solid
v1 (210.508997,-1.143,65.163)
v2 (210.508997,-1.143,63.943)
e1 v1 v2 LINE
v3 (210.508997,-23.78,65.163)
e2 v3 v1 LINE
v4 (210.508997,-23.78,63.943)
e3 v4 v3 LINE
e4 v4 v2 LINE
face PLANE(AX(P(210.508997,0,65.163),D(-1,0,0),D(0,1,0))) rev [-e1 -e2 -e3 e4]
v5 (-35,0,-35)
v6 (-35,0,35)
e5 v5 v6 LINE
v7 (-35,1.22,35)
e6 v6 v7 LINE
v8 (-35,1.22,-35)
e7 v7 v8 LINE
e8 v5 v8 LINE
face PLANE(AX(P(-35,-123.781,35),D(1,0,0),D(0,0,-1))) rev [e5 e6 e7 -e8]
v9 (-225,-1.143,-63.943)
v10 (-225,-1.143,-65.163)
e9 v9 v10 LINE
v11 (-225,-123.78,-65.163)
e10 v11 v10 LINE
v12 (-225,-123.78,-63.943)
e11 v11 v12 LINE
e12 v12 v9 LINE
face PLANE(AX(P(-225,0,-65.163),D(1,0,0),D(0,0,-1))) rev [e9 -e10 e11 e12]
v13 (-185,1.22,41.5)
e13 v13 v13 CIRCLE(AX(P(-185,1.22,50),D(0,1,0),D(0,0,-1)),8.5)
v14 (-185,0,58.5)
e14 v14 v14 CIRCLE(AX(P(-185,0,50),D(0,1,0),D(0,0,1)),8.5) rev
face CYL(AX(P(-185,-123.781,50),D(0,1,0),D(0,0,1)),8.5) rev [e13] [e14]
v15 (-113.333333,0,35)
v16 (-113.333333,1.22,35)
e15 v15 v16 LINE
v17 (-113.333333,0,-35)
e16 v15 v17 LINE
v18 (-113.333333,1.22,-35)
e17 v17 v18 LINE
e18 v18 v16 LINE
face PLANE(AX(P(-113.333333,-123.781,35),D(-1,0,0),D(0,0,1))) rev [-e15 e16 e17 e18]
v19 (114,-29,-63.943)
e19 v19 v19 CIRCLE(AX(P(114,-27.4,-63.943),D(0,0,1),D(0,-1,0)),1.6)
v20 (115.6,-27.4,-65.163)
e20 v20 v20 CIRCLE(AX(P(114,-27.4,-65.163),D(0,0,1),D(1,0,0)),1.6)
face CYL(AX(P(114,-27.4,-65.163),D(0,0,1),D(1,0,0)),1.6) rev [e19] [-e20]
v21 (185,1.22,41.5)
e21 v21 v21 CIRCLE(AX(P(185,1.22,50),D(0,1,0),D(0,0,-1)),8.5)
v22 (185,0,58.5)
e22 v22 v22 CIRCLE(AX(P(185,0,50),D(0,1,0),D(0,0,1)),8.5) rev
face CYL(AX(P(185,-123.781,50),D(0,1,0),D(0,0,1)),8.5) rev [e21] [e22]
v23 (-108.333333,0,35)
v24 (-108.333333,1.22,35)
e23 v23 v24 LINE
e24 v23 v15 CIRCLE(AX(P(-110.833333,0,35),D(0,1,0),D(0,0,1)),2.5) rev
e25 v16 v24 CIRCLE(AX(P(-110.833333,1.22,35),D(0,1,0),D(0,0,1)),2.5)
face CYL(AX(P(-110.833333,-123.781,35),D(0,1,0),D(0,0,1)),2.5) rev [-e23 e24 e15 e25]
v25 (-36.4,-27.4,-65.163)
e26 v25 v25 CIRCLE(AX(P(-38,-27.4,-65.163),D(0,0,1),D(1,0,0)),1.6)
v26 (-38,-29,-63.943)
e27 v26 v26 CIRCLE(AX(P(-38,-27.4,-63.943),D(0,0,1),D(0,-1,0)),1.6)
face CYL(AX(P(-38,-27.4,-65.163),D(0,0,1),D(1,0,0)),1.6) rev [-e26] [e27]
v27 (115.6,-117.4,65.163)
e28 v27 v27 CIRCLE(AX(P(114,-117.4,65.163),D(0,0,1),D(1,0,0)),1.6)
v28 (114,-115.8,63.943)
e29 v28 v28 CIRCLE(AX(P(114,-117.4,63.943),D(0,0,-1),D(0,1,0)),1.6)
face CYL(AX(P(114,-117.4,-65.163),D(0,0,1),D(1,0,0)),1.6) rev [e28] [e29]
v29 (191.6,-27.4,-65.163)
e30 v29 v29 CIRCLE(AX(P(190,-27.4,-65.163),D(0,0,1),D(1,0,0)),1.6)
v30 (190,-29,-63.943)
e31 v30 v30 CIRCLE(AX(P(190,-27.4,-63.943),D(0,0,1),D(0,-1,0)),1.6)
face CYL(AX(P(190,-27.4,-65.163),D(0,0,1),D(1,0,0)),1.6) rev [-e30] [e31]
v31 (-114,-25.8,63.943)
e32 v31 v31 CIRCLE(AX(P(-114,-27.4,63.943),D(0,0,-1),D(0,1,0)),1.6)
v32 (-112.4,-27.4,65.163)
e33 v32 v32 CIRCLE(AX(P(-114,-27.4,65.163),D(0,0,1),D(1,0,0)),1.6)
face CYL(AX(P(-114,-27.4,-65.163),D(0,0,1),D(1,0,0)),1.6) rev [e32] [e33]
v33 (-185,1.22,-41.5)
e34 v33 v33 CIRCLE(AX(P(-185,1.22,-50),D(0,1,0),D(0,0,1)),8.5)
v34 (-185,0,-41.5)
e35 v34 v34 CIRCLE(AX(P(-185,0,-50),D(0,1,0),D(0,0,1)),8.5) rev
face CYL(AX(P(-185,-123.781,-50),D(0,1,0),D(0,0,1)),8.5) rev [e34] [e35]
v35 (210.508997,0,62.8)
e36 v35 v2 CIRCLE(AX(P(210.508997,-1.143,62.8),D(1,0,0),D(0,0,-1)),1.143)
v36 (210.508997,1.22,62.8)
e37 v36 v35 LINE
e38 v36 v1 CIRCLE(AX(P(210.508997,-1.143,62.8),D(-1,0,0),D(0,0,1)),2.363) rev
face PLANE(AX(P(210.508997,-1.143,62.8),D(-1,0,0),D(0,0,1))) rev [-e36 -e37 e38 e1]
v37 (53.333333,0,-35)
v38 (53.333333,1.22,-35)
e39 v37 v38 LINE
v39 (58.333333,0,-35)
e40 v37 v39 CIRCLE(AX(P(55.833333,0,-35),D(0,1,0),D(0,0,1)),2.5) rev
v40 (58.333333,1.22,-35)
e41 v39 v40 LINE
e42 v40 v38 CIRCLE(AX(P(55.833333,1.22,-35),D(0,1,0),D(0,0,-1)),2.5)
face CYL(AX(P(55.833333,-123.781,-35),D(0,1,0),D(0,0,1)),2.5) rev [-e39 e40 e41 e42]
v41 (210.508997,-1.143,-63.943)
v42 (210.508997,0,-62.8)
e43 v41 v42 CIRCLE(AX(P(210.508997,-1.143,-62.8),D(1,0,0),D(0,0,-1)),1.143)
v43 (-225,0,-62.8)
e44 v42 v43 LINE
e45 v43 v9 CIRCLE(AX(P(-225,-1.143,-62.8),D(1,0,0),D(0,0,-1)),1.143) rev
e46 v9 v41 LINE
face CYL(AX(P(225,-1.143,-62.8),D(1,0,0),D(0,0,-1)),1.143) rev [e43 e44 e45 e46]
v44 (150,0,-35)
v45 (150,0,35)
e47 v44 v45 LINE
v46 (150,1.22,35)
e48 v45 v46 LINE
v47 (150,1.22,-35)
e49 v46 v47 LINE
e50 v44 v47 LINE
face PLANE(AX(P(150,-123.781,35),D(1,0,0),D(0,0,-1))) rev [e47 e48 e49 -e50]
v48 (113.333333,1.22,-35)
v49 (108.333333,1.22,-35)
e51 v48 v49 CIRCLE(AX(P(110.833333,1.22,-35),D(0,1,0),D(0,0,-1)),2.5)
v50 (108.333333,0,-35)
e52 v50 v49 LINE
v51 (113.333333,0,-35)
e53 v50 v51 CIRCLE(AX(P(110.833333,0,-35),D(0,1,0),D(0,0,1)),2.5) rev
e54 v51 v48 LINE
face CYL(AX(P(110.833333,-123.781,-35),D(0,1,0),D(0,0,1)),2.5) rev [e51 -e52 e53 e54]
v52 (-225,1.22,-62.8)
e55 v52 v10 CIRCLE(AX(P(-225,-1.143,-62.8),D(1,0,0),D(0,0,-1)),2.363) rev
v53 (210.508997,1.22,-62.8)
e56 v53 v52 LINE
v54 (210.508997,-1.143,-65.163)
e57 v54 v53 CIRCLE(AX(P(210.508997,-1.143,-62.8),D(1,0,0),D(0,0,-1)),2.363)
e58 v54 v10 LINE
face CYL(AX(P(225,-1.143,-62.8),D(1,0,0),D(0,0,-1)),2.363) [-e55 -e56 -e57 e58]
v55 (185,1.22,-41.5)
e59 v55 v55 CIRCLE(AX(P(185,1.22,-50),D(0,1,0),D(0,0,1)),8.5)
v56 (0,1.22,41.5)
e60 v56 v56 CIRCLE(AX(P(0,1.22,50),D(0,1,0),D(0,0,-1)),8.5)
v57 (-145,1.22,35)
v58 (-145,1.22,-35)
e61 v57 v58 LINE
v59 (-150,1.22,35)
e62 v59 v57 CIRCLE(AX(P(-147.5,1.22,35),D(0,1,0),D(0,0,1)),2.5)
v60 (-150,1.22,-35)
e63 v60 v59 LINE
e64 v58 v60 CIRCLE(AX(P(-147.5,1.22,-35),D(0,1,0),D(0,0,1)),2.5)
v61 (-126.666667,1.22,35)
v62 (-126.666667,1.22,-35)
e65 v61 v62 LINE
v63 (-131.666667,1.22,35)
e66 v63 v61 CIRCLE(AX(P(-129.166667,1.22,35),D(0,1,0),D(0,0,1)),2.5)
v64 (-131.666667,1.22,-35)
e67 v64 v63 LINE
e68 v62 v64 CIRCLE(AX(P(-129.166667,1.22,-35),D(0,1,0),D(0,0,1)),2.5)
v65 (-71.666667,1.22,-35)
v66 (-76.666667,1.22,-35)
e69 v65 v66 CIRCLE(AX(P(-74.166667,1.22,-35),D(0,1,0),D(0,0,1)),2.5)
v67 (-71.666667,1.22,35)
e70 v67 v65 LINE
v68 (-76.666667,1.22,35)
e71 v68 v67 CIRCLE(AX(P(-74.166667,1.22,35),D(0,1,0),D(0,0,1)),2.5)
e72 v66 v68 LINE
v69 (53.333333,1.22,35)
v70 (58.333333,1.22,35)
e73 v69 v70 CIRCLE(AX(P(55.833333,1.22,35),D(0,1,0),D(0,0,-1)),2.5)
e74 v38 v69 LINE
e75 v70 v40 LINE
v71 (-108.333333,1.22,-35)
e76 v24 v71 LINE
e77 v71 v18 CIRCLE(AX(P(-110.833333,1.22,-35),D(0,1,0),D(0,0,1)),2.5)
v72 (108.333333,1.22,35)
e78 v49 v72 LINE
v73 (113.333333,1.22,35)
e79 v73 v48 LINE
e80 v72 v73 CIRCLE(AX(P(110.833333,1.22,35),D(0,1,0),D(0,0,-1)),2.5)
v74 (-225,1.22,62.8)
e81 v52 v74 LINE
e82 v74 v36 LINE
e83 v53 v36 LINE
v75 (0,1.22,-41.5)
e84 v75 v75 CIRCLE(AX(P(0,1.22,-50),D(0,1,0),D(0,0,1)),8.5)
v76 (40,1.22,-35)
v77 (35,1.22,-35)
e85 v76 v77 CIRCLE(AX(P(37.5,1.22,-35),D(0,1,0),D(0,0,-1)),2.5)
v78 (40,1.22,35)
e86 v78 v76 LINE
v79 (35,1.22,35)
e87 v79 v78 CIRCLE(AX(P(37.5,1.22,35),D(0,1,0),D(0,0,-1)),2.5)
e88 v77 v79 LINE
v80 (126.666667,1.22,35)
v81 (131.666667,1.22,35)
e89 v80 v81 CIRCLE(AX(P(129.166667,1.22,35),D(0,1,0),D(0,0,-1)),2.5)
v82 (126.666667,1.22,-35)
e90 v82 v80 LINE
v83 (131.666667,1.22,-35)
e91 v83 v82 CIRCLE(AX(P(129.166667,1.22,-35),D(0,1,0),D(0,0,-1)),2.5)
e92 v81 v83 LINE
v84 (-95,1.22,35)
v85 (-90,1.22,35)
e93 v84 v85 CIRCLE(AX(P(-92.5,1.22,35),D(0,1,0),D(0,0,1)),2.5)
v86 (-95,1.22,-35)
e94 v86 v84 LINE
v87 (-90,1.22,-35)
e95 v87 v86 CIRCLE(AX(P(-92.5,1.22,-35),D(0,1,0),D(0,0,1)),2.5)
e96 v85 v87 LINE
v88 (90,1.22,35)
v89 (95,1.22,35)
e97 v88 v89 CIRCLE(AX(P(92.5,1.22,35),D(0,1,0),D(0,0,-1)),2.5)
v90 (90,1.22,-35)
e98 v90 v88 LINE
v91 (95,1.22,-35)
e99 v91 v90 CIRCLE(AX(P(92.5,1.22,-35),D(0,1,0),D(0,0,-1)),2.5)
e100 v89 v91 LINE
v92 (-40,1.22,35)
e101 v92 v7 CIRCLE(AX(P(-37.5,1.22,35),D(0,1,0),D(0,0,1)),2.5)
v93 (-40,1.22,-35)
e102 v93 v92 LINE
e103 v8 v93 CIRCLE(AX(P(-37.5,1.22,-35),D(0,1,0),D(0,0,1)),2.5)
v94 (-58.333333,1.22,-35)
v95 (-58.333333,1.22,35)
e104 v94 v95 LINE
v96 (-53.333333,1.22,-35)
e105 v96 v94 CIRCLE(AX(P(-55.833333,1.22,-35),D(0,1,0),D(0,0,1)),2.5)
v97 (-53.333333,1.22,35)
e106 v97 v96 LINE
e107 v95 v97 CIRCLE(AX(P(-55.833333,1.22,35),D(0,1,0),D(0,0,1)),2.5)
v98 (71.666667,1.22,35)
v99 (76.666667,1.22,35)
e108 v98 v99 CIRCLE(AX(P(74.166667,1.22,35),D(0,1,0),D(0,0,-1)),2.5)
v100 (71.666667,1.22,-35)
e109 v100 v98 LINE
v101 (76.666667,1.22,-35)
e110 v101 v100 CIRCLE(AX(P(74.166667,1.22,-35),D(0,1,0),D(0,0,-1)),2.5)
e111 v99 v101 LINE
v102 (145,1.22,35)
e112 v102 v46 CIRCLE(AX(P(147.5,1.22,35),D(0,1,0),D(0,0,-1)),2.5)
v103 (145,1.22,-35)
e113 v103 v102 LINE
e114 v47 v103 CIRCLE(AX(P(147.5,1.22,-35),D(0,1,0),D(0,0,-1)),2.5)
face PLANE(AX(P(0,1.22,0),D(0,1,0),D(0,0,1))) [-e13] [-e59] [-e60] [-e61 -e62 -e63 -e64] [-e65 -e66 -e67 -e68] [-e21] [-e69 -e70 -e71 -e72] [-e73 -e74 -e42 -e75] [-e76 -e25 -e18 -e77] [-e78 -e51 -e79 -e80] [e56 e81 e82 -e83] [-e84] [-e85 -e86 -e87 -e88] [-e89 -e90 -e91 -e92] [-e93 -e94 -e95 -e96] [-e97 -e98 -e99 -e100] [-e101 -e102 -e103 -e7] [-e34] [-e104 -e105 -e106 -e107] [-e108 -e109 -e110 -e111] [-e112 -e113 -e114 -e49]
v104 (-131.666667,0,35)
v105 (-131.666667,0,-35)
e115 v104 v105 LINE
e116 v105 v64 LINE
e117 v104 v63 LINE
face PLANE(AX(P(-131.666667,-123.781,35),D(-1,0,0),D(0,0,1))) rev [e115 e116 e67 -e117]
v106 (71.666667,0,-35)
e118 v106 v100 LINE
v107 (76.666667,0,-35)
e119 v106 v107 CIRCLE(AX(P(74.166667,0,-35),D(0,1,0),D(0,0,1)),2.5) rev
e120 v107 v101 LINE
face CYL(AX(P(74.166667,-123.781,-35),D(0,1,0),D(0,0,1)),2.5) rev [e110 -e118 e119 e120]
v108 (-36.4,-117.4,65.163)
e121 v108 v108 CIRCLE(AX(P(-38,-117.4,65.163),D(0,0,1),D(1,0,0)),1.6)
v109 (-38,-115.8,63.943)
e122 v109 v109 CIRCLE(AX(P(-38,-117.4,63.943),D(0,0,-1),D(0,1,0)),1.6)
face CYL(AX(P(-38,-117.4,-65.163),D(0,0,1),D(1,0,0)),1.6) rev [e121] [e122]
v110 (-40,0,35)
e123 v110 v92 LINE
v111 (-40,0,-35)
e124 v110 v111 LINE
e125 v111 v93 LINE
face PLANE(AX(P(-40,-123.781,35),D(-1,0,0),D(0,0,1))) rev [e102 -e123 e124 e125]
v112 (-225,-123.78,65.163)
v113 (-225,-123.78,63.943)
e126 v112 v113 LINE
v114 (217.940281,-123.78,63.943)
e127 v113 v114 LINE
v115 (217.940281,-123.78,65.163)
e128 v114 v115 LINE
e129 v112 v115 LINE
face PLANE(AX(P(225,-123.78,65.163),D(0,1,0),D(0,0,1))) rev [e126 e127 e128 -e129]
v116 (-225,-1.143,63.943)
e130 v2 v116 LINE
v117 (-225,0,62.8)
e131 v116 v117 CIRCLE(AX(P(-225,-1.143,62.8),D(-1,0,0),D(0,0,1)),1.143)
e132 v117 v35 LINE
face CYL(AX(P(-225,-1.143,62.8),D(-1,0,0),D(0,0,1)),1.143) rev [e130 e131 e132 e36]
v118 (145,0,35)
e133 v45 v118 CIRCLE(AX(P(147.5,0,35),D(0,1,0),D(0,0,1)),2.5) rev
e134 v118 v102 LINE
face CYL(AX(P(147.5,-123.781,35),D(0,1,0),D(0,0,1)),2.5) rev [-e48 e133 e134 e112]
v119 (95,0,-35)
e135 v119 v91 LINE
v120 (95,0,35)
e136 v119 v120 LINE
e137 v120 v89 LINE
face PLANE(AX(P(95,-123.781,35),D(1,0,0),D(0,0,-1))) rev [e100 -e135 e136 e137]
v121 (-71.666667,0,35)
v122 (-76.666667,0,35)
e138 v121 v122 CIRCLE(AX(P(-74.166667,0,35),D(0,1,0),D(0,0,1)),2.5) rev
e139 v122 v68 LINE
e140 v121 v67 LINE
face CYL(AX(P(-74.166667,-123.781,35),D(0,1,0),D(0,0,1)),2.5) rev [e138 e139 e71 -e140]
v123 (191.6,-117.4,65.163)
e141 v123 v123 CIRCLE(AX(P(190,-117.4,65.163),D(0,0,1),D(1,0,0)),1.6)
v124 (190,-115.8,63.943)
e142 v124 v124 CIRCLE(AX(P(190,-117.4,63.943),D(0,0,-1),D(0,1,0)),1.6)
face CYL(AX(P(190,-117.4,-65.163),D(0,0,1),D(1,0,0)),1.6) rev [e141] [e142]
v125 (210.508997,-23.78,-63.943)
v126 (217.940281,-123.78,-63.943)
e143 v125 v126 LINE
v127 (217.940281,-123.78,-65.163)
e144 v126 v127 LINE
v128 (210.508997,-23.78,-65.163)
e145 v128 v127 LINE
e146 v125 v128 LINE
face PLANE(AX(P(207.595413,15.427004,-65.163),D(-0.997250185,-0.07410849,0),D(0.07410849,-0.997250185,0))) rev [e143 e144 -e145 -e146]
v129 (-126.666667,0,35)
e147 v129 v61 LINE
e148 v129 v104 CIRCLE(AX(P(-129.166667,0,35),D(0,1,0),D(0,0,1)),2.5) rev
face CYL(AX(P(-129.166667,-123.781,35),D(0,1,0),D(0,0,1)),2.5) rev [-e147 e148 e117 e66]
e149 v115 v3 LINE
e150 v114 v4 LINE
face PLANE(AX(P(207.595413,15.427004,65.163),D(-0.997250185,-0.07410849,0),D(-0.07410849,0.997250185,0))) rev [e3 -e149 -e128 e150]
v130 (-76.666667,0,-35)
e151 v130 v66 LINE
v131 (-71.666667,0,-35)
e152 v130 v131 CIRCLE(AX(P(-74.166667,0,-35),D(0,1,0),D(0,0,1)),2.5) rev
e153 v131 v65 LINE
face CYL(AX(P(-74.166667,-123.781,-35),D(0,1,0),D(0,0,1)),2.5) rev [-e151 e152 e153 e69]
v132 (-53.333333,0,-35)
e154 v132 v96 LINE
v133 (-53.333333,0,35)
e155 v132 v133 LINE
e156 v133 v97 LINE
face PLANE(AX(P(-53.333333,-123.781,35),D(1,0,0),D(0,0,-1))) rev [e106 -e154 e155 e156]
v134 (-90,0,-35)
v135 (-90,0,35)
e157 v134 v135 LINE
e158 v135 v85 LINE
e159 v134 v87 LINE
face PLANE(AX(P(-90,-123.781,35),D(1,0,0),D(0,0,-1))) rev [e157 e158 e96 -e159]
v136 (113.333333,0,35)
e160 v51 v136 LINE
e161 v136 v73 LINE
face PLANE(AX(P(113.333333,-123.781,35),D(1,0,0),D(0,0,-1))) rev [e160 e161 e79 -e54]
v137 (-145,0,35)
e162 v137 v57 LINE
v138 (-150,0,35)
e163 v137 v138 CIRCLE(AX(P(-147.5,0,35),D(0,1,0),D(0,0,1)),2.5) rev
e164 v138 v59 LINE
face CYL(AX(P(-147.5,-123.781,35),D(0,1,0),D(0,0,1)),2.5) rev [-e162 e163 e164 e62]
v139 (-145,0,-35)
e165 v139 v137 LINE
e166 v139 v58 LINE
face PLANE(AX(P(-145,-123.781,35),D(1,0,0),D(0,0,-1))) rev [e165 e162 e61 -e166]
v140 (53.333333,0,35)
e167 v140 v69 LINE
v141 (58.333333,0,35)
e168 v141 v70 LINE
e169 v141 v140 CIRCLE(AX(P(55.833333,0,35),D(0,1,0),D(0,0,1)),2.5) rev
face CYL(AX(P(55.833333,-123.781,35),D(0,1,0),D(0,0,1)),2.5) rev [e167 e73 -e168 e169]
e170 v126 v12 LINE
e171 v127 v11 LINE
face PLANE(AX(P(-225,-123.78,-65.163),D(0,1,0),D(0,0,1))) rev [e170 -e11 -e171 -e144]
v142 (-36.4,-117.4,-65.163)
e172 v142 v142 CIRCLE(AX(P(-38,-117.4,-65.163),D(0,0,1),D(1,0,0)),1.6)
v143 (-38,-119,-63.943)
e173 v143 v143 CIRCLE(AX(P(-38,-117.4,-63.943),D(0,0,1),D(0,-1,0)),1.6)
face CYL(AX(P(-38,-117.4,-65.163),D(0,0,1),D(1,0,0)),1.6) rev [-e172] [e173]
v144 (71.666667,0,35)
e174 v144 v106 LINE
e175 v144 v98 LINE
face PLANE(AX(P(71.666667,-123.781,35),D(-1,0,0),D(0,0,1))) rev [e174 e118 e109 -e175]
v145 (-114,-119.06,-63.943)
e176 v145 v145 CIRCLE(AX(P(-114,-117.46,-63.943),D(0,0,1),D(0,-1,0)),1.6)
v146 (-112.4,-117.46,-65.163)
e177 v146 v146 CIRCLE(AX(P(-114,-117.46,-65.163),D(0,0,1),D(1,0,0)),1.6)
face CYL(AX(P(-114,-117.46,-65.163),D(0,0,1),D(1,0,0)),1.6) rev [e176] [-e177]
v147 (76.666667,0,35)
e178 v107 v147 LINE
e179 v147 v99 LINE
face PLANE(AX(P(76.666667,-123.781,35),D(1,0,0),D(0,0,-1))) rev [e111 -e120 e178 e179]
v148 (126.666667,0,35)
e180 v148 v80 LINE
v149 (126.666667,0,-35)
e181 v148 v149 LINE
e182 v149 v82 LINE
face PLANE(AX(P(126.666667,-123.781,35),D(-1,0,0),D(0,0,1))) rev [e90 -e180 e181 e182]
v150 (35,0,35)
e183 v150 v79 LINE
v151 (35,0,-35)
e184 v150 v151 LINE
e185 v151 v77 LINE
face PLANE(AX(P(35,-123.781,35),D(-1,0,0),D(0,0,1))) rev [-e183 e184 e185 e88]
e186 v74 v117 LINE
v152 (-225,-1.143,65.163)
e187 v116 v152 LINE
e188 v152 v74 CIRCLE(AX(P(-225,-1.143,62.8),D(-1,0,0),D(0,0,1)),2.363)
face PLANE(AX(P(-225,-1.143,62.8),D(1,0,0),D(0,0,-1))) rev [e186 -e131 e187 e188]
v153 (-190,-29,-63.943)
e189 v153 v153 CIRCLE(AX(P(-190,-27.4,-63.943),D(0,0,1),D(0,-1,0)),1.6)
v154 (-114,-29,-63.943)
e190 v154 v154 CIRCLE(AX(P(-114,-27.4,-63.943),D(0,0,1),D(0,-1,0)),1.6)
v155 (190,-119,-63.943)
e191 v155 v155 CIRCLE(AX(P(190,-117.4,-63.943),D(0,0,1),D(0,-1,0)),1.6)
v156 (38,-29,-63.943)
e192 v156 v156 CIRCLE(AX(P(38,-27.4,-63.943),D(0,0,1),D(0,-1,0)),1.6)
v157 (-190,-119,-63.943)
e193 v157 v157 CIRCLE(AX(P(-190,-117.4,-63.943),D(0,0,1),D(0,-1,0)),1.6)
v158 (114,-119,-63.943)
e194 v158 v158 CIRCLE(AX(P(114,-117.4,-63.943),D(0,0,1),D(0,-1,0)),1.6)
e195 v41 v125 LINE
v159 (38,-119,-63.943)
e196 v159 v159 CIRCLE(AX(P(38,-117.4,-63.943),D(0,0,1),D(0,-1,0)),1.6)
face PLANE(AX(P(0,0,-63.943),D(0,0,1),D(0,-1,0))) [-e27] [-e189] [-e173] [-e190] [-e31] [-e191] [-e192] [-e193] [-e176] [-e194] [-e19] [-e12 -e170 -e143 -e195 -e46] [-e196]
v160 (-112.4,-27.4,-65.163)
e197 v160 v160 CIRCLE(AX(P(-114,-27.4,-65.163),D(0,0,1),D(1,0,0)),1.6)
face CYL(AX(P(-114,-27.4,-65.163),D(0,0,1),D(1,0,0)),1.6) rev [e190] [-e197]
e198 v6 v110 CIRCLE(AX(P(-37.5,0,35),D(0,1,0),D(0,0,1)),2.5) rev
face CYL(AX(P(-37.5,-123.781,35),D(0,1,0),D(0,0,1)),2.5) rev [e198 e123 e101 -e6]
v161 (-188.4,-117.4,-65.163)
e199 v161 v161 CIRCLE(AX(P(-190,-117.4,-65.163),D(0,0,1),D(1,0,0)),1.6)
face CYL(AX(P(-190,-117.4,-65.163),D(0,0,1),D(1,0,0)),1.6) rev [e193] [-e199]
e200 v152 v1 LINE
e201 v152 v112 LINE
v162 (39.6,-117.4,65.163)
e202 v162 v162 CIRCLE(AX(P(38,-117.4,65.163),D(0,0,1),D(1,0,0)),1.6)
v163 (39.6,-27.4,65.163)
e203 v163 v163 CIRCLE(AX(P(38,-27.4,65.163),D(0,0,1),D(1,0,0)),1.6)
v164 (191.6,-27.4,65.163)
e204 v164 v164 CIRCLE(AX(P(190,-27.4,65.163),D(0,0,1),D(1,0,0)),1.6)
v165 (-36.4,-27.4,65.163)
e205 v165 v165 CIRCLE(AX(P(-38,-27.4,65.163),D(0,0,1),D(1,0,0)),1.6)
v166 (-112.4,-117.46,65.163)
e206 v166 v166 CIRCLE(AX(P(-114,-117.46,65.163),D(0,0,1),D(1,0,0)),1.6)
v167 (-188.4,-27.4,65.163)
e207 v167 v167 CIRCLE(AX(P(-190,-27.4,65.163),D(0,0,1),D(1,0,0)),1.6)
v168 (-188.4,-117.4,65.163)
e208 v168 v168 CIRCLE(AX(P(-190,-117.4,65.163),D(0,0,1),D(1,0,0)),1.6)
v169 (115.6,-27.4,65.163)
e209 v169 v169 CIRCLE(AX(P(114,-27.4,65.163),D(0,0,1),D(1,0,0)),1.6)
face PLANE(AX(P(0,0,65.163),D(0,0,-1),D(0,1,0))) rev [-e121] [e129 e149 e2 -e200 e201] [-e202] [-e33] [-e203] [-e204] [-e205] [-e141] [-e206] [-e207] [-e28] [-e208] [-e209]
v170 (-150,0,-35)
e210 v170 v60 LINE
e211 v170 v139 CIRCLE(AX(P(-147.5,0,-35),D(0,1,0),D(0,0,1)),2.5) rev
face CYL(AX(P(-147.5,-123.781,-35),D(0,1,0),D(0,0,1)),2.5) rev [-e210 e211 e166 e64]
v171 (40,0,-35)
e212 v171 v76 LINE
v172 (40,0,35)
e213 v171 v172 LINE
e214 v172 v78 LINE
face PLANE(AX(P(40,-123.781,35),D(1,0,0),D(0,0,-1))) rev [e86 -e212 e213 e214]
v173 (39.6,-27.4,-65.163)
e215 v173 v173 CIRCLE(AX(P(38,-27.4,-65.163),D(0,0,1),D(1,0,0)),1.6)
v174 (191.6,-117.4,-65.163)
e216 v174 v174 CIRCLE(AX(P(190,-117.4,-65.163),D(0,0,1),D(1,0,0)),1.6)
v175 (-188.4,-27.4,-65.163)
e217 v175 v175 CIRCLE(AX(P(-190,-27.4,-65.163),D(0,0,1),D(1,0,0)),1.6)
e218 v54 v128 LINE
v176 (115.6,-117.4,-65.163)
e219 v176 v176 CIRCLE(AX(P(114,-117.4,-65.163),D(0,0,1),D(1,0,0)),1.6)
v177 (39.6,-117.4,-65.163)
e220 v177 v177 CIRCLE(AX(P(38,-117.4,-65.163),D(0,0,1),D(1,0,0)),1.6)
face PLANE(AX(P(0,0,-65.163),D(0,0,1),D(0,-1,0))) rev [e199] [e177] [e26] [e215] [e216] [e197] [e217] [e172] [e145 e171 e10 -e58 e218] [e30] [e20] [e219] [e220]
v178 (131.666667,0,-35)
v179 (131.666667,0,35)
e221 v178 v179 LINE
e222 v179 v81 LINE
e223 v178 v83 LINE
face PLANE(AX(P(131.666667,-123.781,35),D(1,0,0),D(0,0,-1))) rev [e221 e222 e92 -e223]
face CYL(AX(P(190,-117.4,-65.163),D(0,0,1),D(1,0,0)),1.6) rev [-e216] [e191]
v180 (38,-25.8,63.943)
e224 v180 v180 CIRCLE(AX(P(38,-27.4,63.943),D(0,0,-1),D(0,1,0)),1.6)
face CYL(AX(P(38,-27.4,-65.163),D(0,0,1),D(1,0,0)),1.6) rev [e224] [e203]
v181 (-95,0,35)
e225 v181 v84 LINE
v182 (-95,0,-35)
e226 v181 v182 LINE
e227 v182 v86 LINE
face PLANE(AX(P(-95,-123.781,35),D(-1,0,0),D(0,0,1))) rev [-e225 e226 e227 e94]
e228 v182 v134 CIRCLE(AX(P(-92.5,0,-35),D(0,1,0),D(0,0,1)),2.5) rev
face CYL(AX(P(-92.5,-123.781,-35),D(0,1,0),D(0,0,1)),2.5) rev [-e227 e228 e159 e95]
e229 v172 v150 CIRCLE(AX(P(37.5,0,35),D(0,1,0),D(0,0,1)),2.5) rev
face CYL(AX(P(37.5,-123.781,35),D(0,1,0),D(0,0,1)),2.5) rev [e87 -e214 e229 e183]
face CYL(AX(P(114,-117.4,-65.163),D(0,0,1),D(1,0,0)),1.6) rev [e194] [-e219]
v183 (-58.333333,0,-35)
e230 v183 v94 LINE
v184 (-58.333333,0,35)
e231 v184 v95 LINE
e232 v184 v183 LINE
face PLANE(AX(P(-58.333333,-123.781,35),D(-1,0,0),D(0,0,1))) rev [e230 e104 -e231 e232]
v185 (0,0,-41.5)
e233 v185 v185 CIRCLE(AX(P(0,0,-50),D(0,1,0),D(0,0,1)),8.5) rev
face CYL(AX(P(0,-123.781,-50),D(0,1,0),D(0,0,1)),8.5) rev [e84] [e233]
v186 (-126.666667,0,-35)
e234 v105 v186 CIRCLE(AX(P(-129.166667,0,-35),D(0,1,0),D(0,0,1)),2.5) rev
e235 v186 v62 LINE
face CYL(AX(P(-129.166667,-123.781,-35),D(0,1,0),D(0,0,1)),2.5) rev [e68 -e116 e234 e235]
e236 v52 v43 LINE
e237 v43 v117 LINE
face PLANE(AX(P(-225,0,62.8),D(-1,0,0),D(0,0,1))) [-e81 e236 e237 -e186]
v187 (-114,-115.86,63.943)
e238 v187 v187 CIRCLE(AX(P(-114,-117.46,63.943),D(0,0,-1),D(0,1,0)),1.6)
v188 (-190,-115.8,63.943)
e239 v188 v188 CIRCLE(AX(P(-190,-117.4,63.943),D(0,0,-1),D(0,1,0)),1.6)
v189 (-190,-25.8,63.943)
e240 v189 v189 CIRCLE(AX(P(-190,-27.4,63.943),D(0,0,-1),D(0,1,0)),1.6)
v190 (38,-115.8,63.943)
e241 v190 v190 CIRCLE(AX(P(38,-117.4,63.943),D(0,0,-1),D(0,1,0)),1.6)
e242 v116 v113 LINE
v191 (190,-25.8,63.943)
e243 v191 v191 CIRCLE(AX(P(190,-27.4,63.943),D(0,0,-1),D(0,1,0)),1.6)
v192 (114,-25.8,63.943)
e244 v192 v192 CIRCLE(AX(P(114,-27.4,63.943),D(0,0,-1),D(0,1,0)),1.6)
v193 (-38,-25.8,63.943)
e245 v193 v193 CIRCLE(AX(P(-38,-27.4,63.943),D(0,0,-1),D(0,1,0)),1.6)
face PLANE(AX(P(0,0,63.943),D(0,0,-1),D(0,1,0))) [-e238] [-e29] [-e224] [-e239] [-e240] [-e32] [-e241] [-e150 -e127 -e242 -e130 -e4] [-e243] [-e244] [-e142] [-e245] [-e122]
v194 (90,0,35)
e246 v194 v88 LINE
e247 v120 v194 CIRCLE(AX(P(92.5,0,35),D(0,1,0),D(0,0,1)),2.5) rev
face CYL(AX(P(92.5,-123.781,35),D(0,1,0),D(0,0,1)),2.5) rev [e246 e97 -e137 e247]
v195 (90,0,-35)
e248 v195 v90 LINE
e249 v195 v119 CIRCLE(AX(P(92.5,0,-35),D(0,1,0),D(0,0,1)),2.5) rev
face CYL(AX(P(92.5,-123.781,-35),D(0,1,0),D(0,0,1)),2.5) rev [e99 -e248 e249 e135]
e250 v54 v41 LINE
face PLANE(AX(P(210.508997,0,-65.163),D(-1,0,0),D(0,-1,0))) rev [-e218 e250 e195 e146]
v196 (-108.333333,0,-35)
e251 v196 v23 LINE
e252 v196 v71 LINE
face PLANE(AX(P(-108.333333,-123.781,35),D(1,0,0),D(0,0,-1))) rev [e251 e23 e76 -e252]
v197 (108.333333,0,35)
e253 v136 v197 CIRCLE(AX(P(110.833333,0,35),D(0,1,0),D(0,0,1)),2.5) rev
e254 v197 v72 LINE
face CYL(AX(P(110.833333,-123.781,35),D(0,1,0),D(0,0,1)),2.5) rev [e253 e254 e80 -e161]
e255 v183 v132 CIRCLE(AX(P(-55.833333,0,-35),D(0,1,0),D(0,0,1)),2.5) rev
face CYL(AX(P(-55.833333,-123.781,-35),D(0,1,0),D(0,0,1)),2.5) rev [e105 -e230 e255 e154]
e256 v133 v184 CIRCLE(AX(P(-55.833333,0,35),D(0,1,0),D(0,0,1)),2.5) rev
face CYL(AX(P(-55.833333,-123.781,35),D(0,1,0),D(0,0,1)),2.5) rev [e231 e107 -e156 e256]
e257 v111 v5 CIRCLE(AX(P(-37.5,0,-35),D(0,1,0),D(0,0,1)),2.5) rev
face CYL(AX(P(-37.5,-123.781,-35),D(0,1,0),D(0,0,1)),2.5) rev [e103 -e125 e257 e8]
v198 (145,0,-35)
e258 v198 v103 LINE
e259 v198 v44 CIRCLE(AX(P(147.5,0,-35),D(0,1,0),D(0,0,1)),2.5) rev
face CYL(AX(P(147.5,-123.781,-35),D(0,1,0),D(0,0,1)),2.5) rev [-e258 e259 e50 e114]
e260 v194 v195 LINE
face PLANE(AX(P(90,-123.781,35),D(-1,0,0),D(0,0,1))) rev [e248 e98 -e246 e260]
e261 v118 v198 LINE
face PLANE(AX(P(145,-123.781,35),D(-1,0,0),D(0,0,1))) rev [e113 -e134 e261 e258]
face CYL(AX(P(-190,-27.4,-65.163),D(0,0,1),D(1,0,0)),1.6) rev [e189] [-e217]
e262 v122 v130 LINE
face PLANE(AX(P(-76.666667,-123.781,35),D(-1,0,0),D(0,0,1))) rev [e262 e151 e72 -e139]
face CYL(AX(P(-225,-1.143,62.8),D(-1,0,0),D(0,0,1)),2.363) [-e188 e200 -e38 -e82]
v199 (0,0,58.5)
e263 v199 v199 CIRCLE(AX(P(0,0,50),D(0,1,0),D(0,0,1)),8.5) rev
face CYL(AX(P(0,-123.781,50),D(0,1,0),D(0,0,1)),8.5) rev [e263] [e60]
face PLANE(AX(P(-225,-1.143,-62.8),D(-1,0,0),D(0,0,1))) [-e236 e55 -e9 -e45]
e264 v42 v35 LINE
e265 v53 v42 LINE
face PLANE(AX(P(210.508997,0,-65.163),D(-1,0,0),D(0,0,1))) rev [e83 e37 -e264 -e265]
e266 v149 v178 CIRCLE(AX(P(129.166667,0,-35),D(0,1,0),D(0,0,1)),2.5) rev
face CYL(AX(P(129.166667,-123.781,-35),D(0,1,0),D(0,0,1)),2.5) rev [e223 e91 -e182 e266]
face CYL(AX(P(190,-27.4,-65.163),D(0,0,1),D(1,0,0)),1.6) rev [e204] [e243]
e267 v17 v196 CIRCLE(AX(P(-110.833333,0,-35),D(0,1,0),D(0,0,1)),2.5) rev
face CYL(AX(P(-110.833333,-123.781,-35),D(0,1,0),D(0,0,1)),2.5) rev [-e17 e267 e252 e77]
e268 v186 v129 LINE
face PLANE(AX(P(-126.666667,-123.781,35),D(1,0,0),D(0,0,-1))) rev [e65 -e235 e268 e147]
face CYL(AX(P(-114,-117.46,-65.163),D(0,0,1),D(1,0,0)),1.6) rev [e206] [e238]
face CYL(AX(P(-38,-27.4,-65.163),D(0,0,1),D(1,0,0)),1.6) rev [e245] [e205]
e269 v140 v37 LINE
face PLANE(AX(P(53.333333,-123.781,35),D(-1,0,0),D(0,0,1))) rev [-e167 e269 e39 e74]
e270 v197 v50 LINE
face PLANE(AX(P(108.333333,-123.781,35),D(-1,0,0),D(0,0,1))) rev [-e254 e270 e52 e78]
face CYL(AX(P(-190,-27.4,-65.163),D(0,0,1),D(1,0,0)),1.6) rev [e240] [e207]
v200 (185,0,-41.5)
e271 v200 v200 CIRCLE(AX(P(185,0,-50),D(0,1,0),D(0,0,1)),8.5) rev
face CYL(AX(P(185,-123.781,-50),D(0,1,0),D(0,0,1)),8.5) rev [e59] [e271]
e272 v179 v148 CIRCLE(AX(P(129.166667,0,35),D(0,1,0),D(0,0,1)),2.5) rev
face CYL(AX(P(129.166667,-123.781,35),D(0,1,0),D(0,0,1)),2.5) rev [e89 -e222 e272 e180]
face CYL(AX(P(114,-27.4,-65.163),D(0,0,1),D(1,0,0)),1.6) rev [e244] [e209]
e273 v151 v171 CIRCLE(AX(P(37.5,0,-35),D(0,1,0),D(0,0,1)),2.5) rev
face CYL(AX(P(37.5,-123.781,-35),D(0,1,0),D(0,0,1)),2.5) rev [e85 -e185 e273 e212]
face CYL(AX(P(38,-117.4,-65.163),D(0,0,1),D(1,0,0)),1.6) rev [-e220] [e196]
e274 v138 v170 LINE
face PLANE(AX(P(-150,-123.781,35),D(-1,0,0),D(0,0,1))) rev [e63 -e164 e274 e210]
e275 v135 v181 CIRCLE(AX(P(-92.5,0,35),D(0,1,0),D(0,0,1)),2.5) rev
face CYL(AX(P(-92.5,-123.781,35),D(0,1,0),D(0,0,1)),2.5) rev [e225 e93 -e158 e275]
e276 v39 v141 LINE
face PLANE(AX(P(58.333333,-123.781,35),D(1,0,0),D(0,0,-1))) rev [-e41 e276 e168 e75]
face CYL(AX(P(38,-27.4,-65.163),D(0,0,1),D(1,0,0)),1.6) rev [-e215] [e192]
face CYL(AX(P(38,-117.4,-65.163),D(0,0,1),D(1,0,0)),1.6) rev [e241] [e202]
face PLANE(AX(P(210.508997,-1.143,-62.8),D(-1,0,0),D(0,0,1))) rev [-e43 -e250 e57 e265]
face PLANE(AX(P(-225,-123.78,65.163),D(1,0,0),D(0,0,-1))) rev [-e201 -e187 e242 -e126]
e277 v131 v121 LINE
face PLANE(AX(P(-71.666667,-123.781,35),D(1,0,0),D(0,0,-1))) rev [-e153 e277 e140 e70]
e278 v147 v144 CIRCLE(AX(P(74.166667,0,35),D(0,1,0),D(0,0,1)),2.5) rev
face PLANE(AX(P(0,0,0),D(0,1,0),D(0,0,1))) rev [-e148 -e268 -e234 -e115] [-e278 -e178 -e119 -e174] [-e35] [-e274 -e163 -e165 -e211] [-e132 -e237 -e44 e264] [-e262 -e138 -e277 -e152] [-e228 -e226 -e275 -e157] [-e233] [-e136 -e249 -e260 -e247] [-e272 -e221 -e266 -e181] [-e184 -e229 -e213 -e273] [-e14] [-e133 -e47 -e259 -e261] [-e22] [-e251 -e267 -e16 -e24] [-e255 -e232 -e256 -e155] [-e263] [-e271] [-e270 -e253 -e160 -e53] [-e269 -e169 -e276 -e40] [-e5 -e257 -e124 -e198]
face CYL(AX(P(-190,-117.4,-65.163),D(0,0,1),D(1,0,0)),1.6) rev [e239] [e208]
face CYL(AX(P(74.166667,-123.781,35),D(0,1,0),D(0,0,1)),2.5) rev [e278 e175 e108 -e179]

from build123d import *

# Parameters (mm, degrees)
SKETCH1_W               = 450
SKETCH1_H               = 125.6
BOSS_EXTRUDE1_DEPTH     = 1.22
EDGE_FLANGE1_DEPTH      = 450
EDGE_FLANGE1_BEND_DEPTH = 450
CUT_EXTRUDE1_DEPTH      = 265.939058972
CUT_EXTRUDE1_DEPTH_BACK = 265.939058972
CUT_EXTRUDE4_REACH      = 267.511
SKETCH15_R              = 8.5
CUT_EXTRUDE5_DEPTH      = 265.939058972
CUT_EXTRUDE5_DEPTH_BACK = 265.939058972
SKETCH16_R              = 1.6
CUT_EXTRUDE6_REACH      = 267.511


# Sheet-metal steps are written as plain solids
with BuildPart() as part:
    # Sketch1 → Boss-Extrude1 (new body)
    with BuildSketch(Plane(origin=(0, 0, 0), x_dir=(1, 0, 0), z_dir=(0, 1, 0))):
        Rectangle(SKETCH1_W, SKETCH1_H)
    extrude(amount=BOSS_EXTRUDE1_DEPTH)

    # Edge-Flange1 section (across the edge) → Edge-Flange1 (add)
    with BuildSketch(Plane(origin=(225, 0, 63.943), x_dir=(0, 0, -1), z_dir=(-1, 0, 0))):
        with BuildLine():
            Line((-1.22, 1.143), (-1.22, 123.78))
            Line((-1.22, 123.78), (0, 123.78))
            Line((0, 123.78), (0, 1.143))
            ThreePointArc((0, 1.143), (0.334776949, 0.334776949), (1.143, 0))
            Line((1.143, 0), (1.143, -1.22))
            ThreePointArc((1.143, -1.22), (-0.527893324, -0.527893324), (-1.22, 1.143))
        make_face()
    extrude(amount=EDGE_FLANGE1_DEPTH)

    # Edge-Flange1 section 2 (across the edge) → Edge-Flange1 bend (add)
    with BuildSketch(Plane(origin=(-225, 0, -63.943), x_dir=(0, 0, 1), z_dir=(1, 0, 0))):
        with BuildLine():
            Line((-1.22, 1.143), (-1.22, 123.78))
            Line((-1.22, 123.78), (0, 123.78))
            Line((0, 123.78), (0, 1.143))
            ThreePointArc((0, 1.143), (0.334776949, 0.334776949), (1.143, 0))
            Line((1.143, 0), (1.143, -1.22))
            ThreePointArc((1.143, -1.22), (-0.527893324, -0.527893324), (-1.22, 1.143))
        make_face()
    extrude(amount=EDGE_FLANGE1_BEND_DEPTH)

    # Sketch12 → Cut-Extrude1 (cut, two sides: drawn at the far end of the back side and taken through both)
    with BuildSketch(Plane.XY.offset(-CUT_EXTRUDE1_DEPTH_BACK)):
        Polygon((225, -218.78), (225, -243.78), (235.508996835, -243.78), (235.508996835, 1.22), (210.508996835, 1.22), (210.508996835, -23.78), align=None)
    extrude(amount=CUT_EXTRUDE1_DEPTH + CUT_EXTRUDE1_DEPTH_BACK, mode=Mode.SUBTRACT)

    # Sketch15 → Cut-Extrude4 (cut, up to next)
    with BuildSketch(Plane(origin=(0, 1.22, 0), x_dir=(1, 0, 0), z_dir=(0, 1, 0)), mode=Mode.PRIVATE) as cut_extrude4_sk1:
        with Locations(Location((185, 50, 0), (0, 0, 270))):
            Circle(SKETCH15_R)
    cut_extrude4_tool1 = extrude(cut_extrude4_sk1.sketch, amount=-CUT_EXTRUDE4_REACH, mode=Mode.PRIVATE) & part.part
    # Sketch15 → Cut-Extrude4 (cut, up to next)
    with BuildSketch(Plane(origin=(0, 1.22, 0), x_dir=(1, 0, 0), z_dir=(0, 1, 0)), mode=Mode.PRIVATE) as cut_extrude4_sk2:
        with Locations(Location((-185, 50, 0), (0, 0, 270))):
            Circle(SKETCH15_R)
    cut_extrude4_tool2 = extrude(cut_extrude4_sk2.sketch, amount=-CUT_EXTRUDE4_REACH, mode=Mode.PRIVATE) & part.part
    # Sketch15 → Cut-Extrude4 (cut, up to next)
    with BuildSketch(Plane(origin=(0, 1.22, 0), x_dir=(1, 0, 0), z_dir=(0, 1, 0)), mode=Mode.PRIVATE) as cut_extrude4_sk3:
        with Locations(Location((-185, -50, 0), (0, 0, 270))):
            Circle(SKETCH15_R)
    cut_extrude4_tool3 = extrude(cut_extrude4_sk3.sketch, amount=-CUT_EXTRUDE4_REACH, mode=Mode.PRIVATE) & part.part
    # Sketch15 → Cut-Extrude4 (cut, up to next)
    with BuildSketch(Plane(origin=(0, 1.22, 0), x_dir=(1, 0, 0), z_dir=(0, 1, 0)), mode=Mode.PRIVATE) as cut_extrude4_sk4:
        with Locations(Location((185, -50, 0), (0, 0, 270))):
            Circle(SKETCH15_R)
    cut_extrude4_tool4 = extrude(cut_extrude4_sk4.sketch, amount=-CUT_EXTRUDE4_REACH, mode=Mode.PRIVATE) & part.part
    # Sketch15 → Cut-Extrude4 (cut, up to next)
    with BuildSketch(Plane(origin=(0, 1.22, 0), x_dir=(1, 0, 0), z_dir=(0, 1, 0)), mode=Mode.PRIVATE) as cut_extrude4_sk5:
        with Locations(Location((0, 50, 0), (0, 0, 270))):
            Circle(SKETCH15_R)
    cut_extrude4_tool5 = extrude(cut_extrude4_sk5.sketch, amount=-CUT_EXTRUDE4_REACH, mode=Mode.PRIVATE) & part.part
    # Sketch15 → Cut-Extrude4 (cut, up to next)
    with BuildSketch(Plane(origin=(0, 1.22, 0), x_dir=(1, 0, 0), z_dir=(0, 1, 0)), mode=Mode.PRIVATE) as cut_extrude4_sk6:
        with Locations(Location((0, -50, 0), (0, 0, 270))):
            Circle(SKETCH15_R)
    cut_extrude4_tool6 = extrude(cut_extrude4_sk6.sketch, amount=-CUT_EXTRUDE4_REACH, mode=Mode.PRIVATE) & part.part
    add(cut_extrude4_tool1.solids().sort_by_distance((185, 1.22, -50))[0], mode=Mode.SUBTRACT)
    add(cut_extrude4_tool2.solids().sort_by_distance((-185, 1.22, -50))[0], mode=Mode.SUBTRACT)
    add(cut_extrude4_tool3.solids().sort_by_distance((-185, 1.22, 50))[0], mode=Mode.SUBTRACT)
    add(cut_extrude4_tool4.solids().sort_by_distance((185, 1.22, 50))[0], mode=Mode.SUBTRACT)
    add(cut_extrude4_tool5.solids().sort_by_distance((0, 1.22, -50))[0], mode=Mode.SUBTRACT)
    add(cut_extrude4_tool6.solids().sort_by_distance((0, 1.22, 50))[0], mode=Mode.SUBTRACT)

    # Sketch16 → Cut-Extrude5 (cut, two sides: drawn at the far end of the back side and taken through both)
    with BuildSketch(Plane.XY.offset(-CUT_EXTRUDE5_DEPTH_BACK)):
        with Locations((-190, -27.4)):
            Circle(SKETCH16_R)
        with Locations((-114, -27.4)):
            Circle(SKETCH16_R)
        with Locations((-38, -27.4)):
            Circle(SKETCH16_R)
        with Locations((38, -27.4)):
            Circle(SKETCH16_R)
        with Locations((114, -27.4)):
            Circle(SKETCH16_R)
        with Locations((190, -27.4)):
            Circle(SKETCH16_R)
        with Locations((190, -117.4)):
            Circle(SKETCH16_R)
        with Locations((114, -117.4)):
            Circle(SKETCH16_R)
        with Locations((38, -117.4)):
            Circle(SKETCH16_R)
        with Locations((-38, -117.4)):
            Circle(SKETCH16_R)
        with Locations((-114, -117.46)):
            Circle(SKETCH16_R)
        with Locations((-190, -117.4)):
            Circle(SKETCH16_R)
    extrude(amount=CUT_EXTRUDE5_DEPTH + CUT_EXTRUDE5_DEPTH_BACK, mode=Mode.SUBTRACT)

    # Sketch17 → Cut-Extrude6 (cut, up to next)
    with BuildSketch(Plane(origin=(0, 1.22, 0), x_dir=(1, 0, 0), z_dir=(0, 1, 0)), mode=Mode.PRIVATE) as cut_extrude6_sk1:
        with BuildLine():
            Line((-150, -35), (-150, 35))
            ThreePointArc((-150, 35), (-147.5, 37.5), (-145, 35))
            Line((-145, 35), (-145, -35))
            ThreePointArc((-145, -35), (-147.5, -37.5), (-150, -35))
        make_face()
    cut_extrude6_tool1 = extrude(cut_extrude6_sk1.sketch, amount=-CUT_EXTRUDE6_REACH, mode=Mode.PRIVATE) & part.part
    # Sketch17 → Cut-Extrude6 (cut, up to next)
    with BuildSketch(Plane(origin=(0, 1.22, 0), x_dir=(1, 0, 0), z_dir=(0, 1, 0)), mode=Mode.PRIVATE) as cut_extrude6_sk2:
        with BuildLine():
            Line((-126.666666667, -35), (-126.666666667, 35))
            ThreePointArc((-126.666666667, 35), (-129.166666667, 37.5), (-131.666666667, 35))
            Line((-131.666666667, 35), (-131.666666667, -35))
            ThreePointArc((-131.666666667, -35), (-129.166666667, -37.5), (-126.666666667, -35))
        make_face()
    cut_extrude6_tool2 = extrude(cut_extrude6_sk2.sketch, amount=-CUT_EXTRUDE6_REACH, mode=Mode.PRIVATE) & part.part
    # Sketch17 → Cut-Extrude6 (cut, up to next)
    with BuildSketch(Plane(origin=(0, 1.22, 0), x_dir=(1, 0, 0), z_dir=(0, 1, 0)), mode=Mode.PRIVATE) as cut_extrude6_sk3:
        with BuildLine():
            Line((-108.333333333, -35), (-108.333333333, 35))
            ThreePointArc((-108.333333333, 35), (-110.833333333, 37.5), (-113.333333333, 35))
            Line((-113.333333333, 35), (-113.333333333, -35))
            ThreePointArc((-113.333333333, -35), (-110.833333333, -37.5), (-108.333333333, -35))
        make_face()
    cut_extrude6_tool3 = extrude(cut_extrude6_sk3.sketch, amount=-CUT_EXTRUDE6_REACH, mode=Mode.PRIVATE) & part.part
    # Sketch17 → Cut-Extrude6 (cut, up to next)
    with BuildSketch(Plane(origin=(0, 1.22, 0), x_dir=(1, 0, 0), z_dir=(0, 1, 0)), mode=Mode.PRIVATE) as cut_extrude6_sk4:
        with BuildLine():
            Line((-90, -35), (-90, 35))
            ThreePointArc((-90, 35), (-92.5, 37.5), (-95, 35))
            Line((-95, 35), (-95, -35))
            ThreePointArc((-95, -35), (-92.5, -37.5), (-90, -35))
        make_face()
    cut_extrude6_tool4 = extrude(cut_extrude6_sk4.sketch, amount=-CUT_EXTRUDE6_REACH, mode=Mode.PRIVATE) & part.part
    # Sketch17 → Cut-Extrude6 (cut, up to next)
    with BuildSketch(Plane(origin=(0, 1.22, 0), x_dir=(1, 0, 0), z_dir=(0, 1, 0)), mode=Mode.PRIVATE) as cut_extrude6_sk5:
        with BuildLine():
            Line((-71.666666667, -35), (-71.666666667, 35))
            ThreePointArc((-71.666666667, 35), (-74.166666667, 37.5), (-76.666666667, 35))
            Line((-76.666666667, 35), (-76.666666667, -35))
            ThreePointArc((-76.666666667, -35), (-74.166666667, -37.5), (-71.666666667, -35))
        make_face()
    cut_extrude6_tool5 = extrude(cut_extrude6_sk5.sketch, amount=-CUT_EXTRUDE6_REACH, mode=Mode.PRIVATE) & part.part
    # Sketch17 → Cut-Extrude6 (cut, up to next)
    with BuildSketch(Plane(origin=(0, 1.22, 0), x_dir=(1, 0, 0), z_dir=(0, 1, 0)), mode=Mode.PRIVATE) as cut_extrude6_sk6:
        with BuildLine():
            Line((-53.333333333, -35), (-53.333333333, 35))
            ThreePointArc((-53.333333333, 35), (-55.833333333, 37.5), (-58.333333333, 35))
            Line((-58.333333333, 35), (-58.333333333, -35))
            ThreePointArc((-58.333333333, -35), (-55.833333333, -37.5), (-53.333333333, -35))
        make_face()
    cut_extrude6_tool6 = extrude(cut_extrude6_sk6.sketch, amount=-CUT_EXTRUDE6_REACH, mode=Mode.PRIVATE) & part.part
    # Sketch17 → Cut-Extrude6 (cut, up to next)
    with BuildSketch(Plane(origin=(0, 1.22, 0), x_dir=(1, 0, 0), z_dir=(0, 1, 0)), mode=Mode.PRIVATE) as cut_extrude6_sk7:
        with BuildLine():
            Line((-35, -35), (-35, 35))
            ThreePointArc((-35, 35), (-37.5, 37.5), (-40, 35))
            Line((-40, 35), (-40, -35))
            ThreePointArc((-40, -35), (-37.5, -37.5), (-35, -35))
        make_face()
    cut_extrude6_tool7 = extrude(cut_extrude6_sk7.sketch, amount=-CUT_EXTRUDE6_REACH, mode=Mode.PRIVATE) & part.part
    # Sketch17 → Cut-Extrude6 (cut, up to next)
    with BuildSketch(Plane(origin=(0, 1.22, 0), x_dir=(1, 0, 0), z_dir=(0, 1, 0)), mode=Mode.PRIVATE) as cut_extrude6_sk8:
        with BuildLine():
            Line((150, -35), (150, 35))
            ThreePointArc((150, 35), (147.5, 37.5), (145, 35))
            Line((145, 35), (145, -35))
            ThreePointArc((145, -35), (147.5, -37.5), (150, -35))
        make_face()
    cut_extrude6_tool8 = extrude(cut_extrude6_sk8.sketch, amount=-CUT_EXTRUDE6_REACH, mode=Mode.PRIVATE) & part.part
    # Sketch17 → Cut-Extrude6 (cut, up to next)
    with BuildSketch(Plane(origin=(0, 1.22, 0), x_dir=(1, 0, 0), z_dir=(0, 1, 0)), mode=Mode.PRIVATE) as cut_extrude6_sk9:
        with BuildLine():
            Line((131.666666667, -35), (131.666666667, 35))
            ThreePointArc((131.666666667, 35), (129.166666667, 37.5), (126.666666667, 35))
            Line((126.666666667, 35), (126.666666667, -35))
            ThreePointArc((126.666666667, -35), (129.166666667, -37.5), (131.666666667, -35))
        make_face()
    cut_extrude6_tool9 = extrude(cut_extrude6_sk9.sketch, amount=-CUT_EXTRUDE6_REACH, mode=Mode.PRIVATE) & part.part
    # Sketch17 → Cut-Extrude6 (cut, up to next)
    with BuildSketch(Plane(origin=(0, 1.22, 0), x_dir=(1, 0, 0), z_dir=(0, 1, 0)), mode=Mode.PRIVATE) as cut_extrude6_sk10:
        with BuildLine():
            Line((113.333333333, -35), (113.333333333, 35))
            ThreePointArc((113.333333333, 35), (110.833333333, 37.5), (108.333333333, 35))
            Line((108.333333333, 35), (108.333333333, -35))
            ThreePointArc((108.333333333, -35), (110.833333333, -37.5), (113.333333333, -35))
        make_face()
    cut_extrude6_tool10 = extrude(cut_extrude6_sk10.sketch, amount=-CUT_EXTRUDE6_REACH, mode=Mode.PRIVATE) & part.part
    # Sketch17 → Cut-Extrude6 (cut, up to next)
    with BuildSketch(Plane(origin=(0, 1.22, 0), x_dir=(1, 0, 0), z_dir=(0, 1, 0)), mode=Mode.PRIVATE) as cut_extrude6_sk11:
        with BuildLine():
            Line((95, -35), (95, 35))
            ThreePointArc((95, 35), (92.5, 37.5), (90, 35))
            Line((90, 35), (90, -35))
            ThreePointArc((90, -35), (92.5, -37.5), (95, -35))
        make_face()
    cut_extrude6_tool11 = extrude(cut_extrude6_sk11.sketch, amount=-CUT_EXTRUDE6_REACH, mode=Mode.PRIVATE) & part.part
    # Sketch17 → Cut-Extrude6 (cut, up to next)
    with BuildSketch(Plane(origin=(0, 1.22, 0), x_dir=(1, 0, 0), z_dir=(0, 1, 0)), mode=Mode.PRIVATE) as cut_extrude6_sk12:
        with BuildLine():
            Line((76.666666667, -35), (76.666666667, 35))
            ThreePointArc((76.666666667, 35), (74.166666667, 37.5), (71.666666667, 35))
            Line((71.666666667, 35), (71.666666667, -35))
            ThreePointArc((71.666666667, -35), (74.166666667, -37.5), (76.666666667, -35))
        make_face()
    cut_extrude6_tool12 = extrude(cut_extrude6_sk12.sketch, amount=-CUT_EXTRUDE6_REACH, mode=Mode.PRIVATE) & part.part
    # Sketch17 → Cut-Extrude6 (cut, up to next)
    with BuildSketch(Plane(origin=(0, 1.22, 0), x_dir=(1, 0, 0), z_dir=(0, 1, 0)), mode=Mode.PRIVATE) as cut_extrude6_sk13:
        with BuildLine():
            Line((58.333333333, -35), (58.333333333, 35))
            ThreePointArc((58.333333333, 35), (55.833333333, 37.5), (53.333333333, 35))
            Line((53.333333333, 35), (53.333333333, -35))
            ThreePointArc((53.333333333, -35), (55.833333333, -37.5), (58.333333333, -35))
        make_face()
    cut_extrude6_tool13 = extrude(cut_extrude6_sk13.sketch, amount=-CUT_EXTRUDE6_REACH, mode=Mode.PRIVATE) & part.part
    # Sketch17 → Cut-Extrude6 (cut, up to next)
    with BuildSketch(Plane(origin=(0, 1.22, 0), x_dir=(1, 0, 0), z_dir=(0, 1, 0)), mode=Mode.PRIVATE) as cut_extrude6_sk14:
        with BuildLine():
            Line((40, -35), (40, 35))
            ThreePointArc((40, 35), (37.5, 37.5), (35, 35))
            Line((35, 35), (35, -35))
            ThreePointArc((35, -35), (37.5, -37.5), (40, -35))
        make_face()
    cut_extrude6_tool14 = extrude(cut_extrude6_sk14.sketch, amount=-CUT_EXTRUDE6_REACH, mode=Mode.PRIVATE) & part.part
    add(cut_extrude6_tool1.solids().sort_by_distance((-147.5, 1.22, 0))[0], mode=Mode.SUBTRACT)
    add(cut_extrude6_tool2.solids().sort_by_distance((-129.166667, 1.22, 0))[0], mode=Mode.SUBTRACT)
    add(cut_extrude6_tool3.solids().sort_by_distance((-110.833333, 1.22, 0))[0], mode=Mode.SUBTRACT)
    add(cut_extrude6_tool4.solids().sort_by_distance((-92.5, 1.22, 0))[0], mode=Mode.SUBTRACT)
    add(cut_extrude6_tool5.solids().sort_by_distance((-74.166667, 1.22, 0))[0], mode=Mode.SUBTRACT)
    add(cut_extrude6_tool6.solids().sort_by_distance((-55.833333, 1.22, 0))[0], mode=Mode.SUBTRACT)
    add(cut_extrude6_tool7.solids().sort_by_distance((-37.5, 1.22, 0))[0], mode=Mode.SUBTRACT)
    add(cut_extrude6_tool8.solids().sort_by_distance((147.5, 1.22, 0))[0], mode=Mode.SUBTRACT)
    add(cut_extrude6_tool9.solids().sort_by_distance((129.166667, 1.22, 0))[0], mode=Mode.SUBTRACT)
    add(cut_extrude6_tool10.solids().sort_by_distance((110.833333, 1.22, 0))[0], mode=Mode.SUBTRACT)
    add(cut_extrude6_tool11.solids().sort_by_distance((92.5, 1.22, 0))[0], mode=Mode.SUBTRACT)
    add(cut_extrude6_tool12.solids().sort_by_distance((74.166667, 1.22, 0))[0], mode=Mode.SUBTRACT)
    add(cut_extrude6_tool13.solids().sort_by_distance((55.833333, 1.22, 0))[0], mode=Mode.SUBTRACT)
    add(cut_extrude6_tool14.solids().sort_by_distance((37.5, 1.22, 0))[0], mode=Mode.SUBTRACT)


solid = part.part
